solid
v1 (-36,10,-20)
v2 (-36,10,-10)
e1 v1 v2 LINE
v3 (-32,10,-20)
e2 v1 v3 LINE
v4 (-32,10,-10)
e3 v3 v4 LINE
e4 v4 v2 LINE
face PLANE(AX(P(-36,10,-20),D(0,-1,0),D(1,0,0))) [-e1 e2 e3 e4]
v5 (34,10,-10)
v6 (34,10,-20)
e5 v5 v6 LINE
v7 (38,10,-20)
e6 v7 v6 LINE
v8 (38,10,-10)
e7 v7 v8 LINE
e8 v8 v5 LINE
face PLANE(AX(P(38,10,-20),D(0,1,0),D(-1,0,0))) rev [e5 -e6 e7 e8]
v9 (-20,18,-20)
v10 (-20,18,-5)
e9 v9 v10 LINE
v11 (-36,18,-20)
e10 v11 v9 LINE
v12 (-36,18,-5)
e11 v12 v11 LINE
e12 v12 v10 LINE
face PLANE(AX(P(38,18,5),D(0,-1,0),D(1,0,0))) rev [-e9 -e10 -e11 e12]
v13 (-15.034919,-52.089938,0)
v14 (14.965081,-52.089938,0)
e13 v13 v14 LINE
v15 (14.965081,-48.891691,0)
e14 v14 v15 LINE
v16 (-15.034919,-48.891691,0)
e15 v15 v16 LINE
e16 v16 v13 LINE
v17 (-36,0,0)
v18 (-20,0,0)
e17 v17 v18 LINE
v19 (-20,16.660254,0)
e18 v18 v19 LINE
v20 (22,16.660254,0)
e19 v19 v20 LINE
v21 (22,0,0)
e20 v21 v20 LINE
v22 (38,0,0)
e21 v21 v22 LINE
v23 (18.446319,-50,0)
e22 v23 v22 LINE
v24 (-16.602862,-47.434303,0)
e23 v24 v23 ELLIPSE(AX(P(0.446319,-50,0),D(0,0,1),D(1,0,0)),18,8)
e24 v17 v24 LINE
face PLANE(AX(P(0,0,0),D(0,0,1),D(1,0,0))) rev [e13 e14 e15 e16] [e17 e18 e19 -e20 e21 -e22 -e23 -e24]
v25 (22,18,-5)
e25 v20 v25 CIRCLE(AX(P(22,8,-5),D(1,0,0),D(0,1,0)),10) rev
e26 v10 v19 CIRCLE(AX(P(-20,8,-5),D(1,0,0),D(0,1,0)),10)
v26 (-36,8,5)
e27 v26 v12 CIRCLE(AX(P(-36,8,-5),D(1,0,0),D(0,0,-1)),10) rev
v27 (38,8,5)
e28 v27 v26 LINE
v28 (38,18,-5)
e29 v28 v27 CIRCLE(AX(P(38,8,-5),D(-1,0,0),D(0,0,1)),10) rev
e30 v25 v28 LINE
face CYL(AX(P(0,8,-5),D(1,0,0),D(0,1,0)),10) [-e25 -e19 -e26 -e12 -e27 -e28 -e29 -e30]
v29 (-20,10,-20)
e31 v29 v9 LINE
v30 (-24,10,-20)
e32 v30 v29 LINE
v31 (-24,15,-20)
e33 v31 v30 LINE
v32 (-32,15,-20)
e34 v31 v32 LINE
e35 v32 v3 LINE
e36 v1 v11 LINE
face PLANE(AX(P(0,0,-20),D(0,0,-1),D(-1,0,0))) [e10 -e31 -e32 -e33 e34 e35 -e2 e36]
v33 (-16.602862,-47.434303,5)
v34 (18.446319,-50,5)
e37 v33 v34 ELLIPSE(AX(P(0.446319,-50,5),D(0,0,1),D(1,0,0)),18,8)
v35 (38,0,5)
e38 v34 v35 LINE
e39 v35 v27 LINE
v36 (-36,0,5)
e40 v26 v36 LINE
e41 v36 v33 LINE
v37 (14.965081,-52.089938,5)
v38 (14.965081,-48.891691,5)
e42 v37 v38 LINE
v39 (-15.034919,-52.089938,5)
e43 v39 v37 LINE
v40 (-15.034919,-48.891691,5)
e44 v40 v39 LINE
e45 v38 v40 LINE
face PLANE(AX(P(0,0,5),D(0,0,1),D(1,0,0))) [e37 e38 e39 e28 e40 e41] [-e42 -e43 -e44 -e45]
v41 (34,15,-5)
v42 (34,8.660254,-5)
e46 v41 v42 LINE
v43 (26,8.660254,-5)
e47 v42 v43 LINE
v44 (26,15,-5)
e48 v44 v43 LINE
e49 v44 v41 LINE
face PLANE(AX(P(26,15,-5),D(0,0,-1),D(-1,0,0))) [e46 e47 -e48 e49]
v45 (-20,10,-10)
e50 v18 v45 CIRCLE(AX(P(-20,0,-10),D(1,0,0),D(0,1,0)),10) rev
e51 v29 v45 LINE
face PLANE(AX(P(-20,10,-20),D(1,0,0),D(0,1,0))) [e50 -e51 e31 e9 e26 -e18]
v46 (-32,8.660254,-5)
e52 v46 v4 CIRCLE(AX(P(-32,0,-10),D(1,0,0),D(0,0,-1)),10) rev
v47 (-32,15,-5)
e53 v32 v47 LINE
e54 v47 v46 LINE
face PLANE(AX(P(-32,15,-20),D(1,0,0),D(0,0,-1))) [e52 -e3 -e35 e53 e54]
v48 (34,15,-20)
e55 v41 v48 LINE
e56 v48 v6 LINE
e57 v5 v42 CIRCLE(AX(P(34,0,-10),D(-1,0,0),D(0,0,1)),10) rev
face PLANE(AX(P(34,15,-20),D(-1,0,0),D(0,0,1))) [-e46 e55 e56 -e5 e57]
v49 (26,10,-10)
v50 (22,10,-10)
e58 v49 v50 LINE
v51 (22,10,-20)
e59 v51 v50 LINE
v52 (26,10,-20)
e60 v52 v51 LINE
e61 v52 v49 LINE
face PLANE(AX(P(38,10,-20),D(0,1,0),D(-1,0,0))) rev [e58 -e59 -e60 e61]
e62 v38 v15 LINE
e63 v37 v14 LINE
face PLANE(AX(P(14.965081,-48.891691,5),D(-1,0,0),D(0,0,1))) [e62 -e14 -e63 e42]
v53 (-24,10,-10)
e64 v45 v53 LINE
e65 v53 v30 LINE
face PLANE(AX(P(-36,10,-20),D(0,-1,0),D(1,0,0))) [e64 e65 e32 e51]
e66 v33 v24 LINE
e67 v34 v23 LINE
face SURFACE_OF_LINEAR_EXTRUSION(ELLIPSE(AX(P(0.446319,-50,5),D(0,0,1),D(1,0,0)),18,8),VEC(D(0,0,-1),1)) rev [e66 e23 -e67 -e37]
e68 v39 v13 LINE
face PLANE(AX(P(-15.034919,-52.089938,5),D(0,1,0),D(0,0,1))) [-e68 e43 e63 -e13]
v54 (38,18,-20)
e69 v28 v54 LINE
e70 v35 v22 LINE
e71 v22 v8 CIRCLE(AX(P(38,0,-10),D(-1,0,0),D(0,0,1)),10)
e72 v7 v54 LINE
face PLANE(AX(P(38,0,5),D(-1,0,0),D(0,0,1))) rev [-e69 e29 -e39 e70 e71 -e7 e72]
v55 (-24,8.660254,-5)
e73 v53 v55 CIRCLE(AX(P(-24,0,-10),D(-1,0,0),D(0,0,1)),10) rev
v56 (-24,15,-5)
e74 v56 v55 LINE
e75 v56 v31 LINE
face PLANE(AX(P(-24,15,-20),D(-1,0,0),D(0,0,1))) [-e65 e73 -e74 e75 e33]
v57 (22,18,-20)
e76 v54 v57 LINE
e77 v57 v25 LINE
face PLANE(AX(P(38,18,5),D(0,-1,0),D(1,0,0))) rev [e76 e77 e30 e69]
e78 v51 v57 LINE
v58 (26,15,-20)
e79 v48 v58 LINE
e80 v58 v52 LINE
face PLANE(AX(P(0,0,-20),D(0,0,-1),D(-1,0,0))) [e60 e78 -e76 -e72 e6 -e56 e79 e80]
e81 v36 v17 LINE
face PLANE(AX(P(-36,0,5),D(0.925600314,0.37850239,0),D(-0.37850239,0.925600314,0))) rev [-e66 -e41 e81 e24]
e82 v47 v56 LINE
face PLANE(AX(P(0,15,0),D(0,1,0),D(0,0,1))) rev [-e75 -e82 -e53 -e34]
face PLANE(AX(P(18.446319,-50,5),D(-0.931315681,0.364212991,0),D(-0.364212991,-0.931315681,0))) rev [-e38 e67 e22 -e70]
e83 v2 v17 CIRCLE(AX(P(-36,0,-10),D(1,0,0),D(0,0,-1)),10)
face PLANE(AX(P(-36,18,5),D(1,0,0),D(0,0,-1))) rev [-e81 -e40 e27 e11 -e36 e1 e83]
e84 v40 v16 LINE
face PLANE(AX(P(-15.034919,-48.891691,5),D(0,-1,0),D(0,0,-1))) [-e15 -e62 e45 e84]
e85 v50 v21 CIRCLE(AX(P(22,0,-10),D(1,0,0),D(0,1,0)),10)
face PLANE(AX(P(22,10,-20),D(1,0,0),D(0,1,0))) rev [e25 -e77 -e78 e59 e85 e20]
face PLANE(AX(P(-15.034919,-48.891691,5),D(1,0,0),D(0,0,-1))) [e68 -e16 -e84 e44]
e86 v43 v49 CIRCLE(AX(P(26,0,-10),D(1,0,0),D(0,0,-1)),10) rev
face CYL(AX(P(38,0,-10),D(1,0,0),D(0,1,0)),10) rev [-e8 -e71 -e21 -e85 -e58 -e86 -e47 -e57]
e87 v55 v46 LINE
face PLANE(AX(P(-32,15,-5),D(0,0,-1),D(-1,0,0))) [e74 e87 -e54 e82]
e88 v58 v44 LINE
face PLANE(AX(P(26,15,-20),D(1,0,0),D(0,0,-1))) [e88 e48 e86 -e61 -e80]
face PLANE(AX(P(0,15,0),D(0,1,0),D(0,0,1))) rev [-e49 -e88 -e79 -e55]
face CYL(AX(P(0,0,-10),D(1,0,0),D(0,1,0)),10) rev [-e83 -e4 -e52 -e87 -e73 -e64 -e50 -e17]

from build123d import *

# Parameters (mm, degrees)
PLATE_FEATURE_DEPTH        = 5
STRAP_FEATURE_SKETCH_RX    = 18
STRAP_FEATURE_SKETCH_RY    = 8
STRAP_FEATURE_DEPTH        = 5
STRAP_CUT_SKETCH_W         = 30
STRAP_CUT_SKETCH_H         = 3.19824666
STRAP_CUT_DEPTH            = 5
LEFT_LEG_FEATURE_SKETCH_W  = 16
LEFT_LEG_FEATURE_SKETCH_H  = 8
LEFT_LEG_FEATURE_DEPTH     = 20
RIGHT_LEG_FEATURE_SKETCH_W = 16
RIGHT_LEG_FEATURE_SKETCH_H = 8
RIGHT_LEG_FEATURE_DEPTH    = 20
TAB_CUT_SKETCH_W           = 8
TAB_CUT_SKETCH_H           = 15
TAB_CUT_DEPTH              = 5
FILLET1_R                  = 10
FILLET2_R                  = 10
FILLET3_R                  = 10


with BuildPart() as part:
    # Plate Feature Sketch → Plate Feature (new body)
    with BuildSketch(Plane.XY):
        Polygon((-36, 18), (-36, 0), (-15.55368079, -50), (18.44631921, -50), (38, 0), (38, 18), align=None)
    extrude(amount=PLATE_FEATURE_DEPTH)

    # Strap Feature Sketch → Strap Feature (add)
    with BuildSketch(Plane.XY):
        with Locations((0.44631921, -50)):
            Ellipse(STRAP_FEATURE_SKETCH_RX, STRAP_FEATURE_SKETCH_RY)
    extrude(amount=STRAP_FEATURE_DEPTH)

    # Strap Cut Sketch → Strap Cut (cut)
    with BuildSketch(Plane.XY):
        with Locations((-0.034918838, -50.490814337)):
            Rectangle(STRAP_CUT_SKETCH_W, STRAP_CUT_SKETCH_H)
    extrude(amount=STRAP_CUT_DEPTH, mode=Mode.SUBTRACT)

    # Left Leg Feature Sketch → Left Leg Feature (add)
    with BuildSketch(Plane.XY):
        with Locations((30, 14)):
            Rectangle(LEFT_LEG_FEATURE_SKETCH_W, LEFT_LEG_FEATURE_SKETCH_H)
    extrude(amount=-LEFT_LEG_FEATURE_DEPTH)

    # Right Leg Feature Sketch → Right Leg Feature (add)
    with BuildSketch(Plane.XY):
        with Locations((-28, 14)):
            Rectangle(RIGHT_LEG_FEATURE_SKETCH_W, RIGHT_LEG_FEATURE_SKETCH_H)
    extrude(amount=-RIGHT_LEG_FEATURE_DEPTH)

    # Tab Cut Sketch → Tab Cut (cut)
    with BuildSketch(Plane(origin=(0, 10, 0), x_dir=(1, 0, 0), z_dir=(0, 1, 0))):
        with Locations((-28, 12.5)):
            Rectangle(TAB_CUT_SKETCH_W, TAB_CUT_SKETCH_H)
        with Locations((30, 12.5)):
            Rectangle(TAB_CUT_SKETCH_W, TAB_CUT_SKETCH_H)
    extrude(amount=TAB_CUT_DEPTH, mode=Mode.SUBTRACT)

    # Fillet1
    # the kernel refuses this fillet: 10 mm, written as the material it takes off along each edge
    with BuildSketch(Plane(origin=(63, 18, 5), x_dir=(0, 0, -1), z_dir=(-1, 0, 0))) as fillet1_piece_1:
        with BuildLine():
            CenterArc((FILLET1_R, FILLET1_R), FILLET1_R, 180, 90)
            Line((0, FILLET1_R), (0, 0))
            Line((0, 0), (FILLET1_R, 0))
        make_face()
    extrude(amount=124, mode=Mode.SUBTRACT)

    # Fillet2
    # the kernel refuses this fillet: 10 mm, written as the material it adds along each edge
    with BuildSketch(Plane(origin=(-36, 10, 0), x_dir=(0, 0, -1), z_dir=(1, 0, 0))) as fillet2_piece_1_section:
        with BuildLine():
            CenterArc((FILLET2_R, -FILLET2_R), FILLET2_R, 90, 90)
            Line((0, -FILLET2_R), (0, 0))
            Line((0, 0), (FILLET2_R, 0))
        make_face()
    fillet2_piece_1 = extrude(amount=16, mode=Mode.PRIVATE)
    fillet2_piece_1 = split(fillet2_piece_1, bisect_by=Plane(origin=(-34, 9.759916183, -5), z_dir=(0, 0, -1)), keep=Keep.TOP, mode=Mode.PRIVATE)
    fillet2_piece_1 = split(fillet2_piece_1, bisect_by=Plane(origin=(-32, 9.759916183, -6.632507845), z_dir=(-1, 0, 0)), keep=Keep.TOP, mode=Mode.PRIVATE)
    add(fillet2_piece_1)
    with BuildSketch(Plane(origin=(-36, 10, 0), x_dir=(0, 0, -1), z_dir=(1, 0, 0))) as fillet2_piece_2_section:
        with BuildLine():
            CenterArc((FILLET2_R, -FILLET2_R), FILLET2_R, 90, 90)
            Line((0, -FILLET2_R), (0, 0))
            Line((0, 0), (FILLET2_R, 0))
        make_face()
    fillet2_piece_2 = extrude(amount=16, mode=Mode.PRIVATE)
    fillet2_piece_2 = split(fillet2_piece_2, bisect_by=Plane(origin=(-34, 7.4487994, -5), z_dir=(0, 0, 1)), keep=Keep.TOP, mode=Mode.PRIVATE)
    fillet2_piece_2 = split(fillet2_piece_2, bisect_by=Plane(origin=(-32, 7.4487994, -1.643917643), z_dir=(-1, 0, 0)), keep=Keep.TOP, mode=Mode.PRIVATE)
    add(fillet2_piece_2)
    with BuildSketch(Plane(origin=(-36, 10, 0), x_dir=(0, 0, -1), z_dir=(1, 0, 0))) as fillet2_piece_3_section:
        with BuildLine():
            CenterArc((FILLET2_R, -FILLET2_R), FILLET2_R, 90, 90)
            Line((0, -FILLET2_R), (0, 0))
            Line((0, 0), (FILLET2_R, 0))
        make_face()
    fillet2_piece_3 = extrude(amount=16, mode=Mode.PRIVATE)
    fillet2_piece_3 = split(fillet2_piece_3, bisect_by=Plane(origin=(-24, 7.4487994, -1.643917643), z_dir=(-1, 0, 0)), keep=Keep.TOP, mode=Mode.PRIVATE)
    fillet2_piece_3 = split(fillet2_piece_3, bisect_by=Plane(origin=(-28, 7.4487994, -5), z_dir=(0, 0, 1)), keep=Keep.TOP, mode=Mode.PRIVATE)
    fillet2_piece_3 = split(fillet2_piece_3, bisect_by=Plane(origin=(-32, 7.4487994, -1.643917643), z_dir=(1, 0, 0)), keep=Keep.TOP, mode=Mode.PRIVATE)
    add(fillet2_piece_3)
    with BuildSketch(Plane(origin=(-36, 10, 0), x_dir=(0, 0, -1), z_dir=(1, 0, 0))) as fillet2_piece_4_section:
        with BuildLine():
            CenterArc((FILLET2_R, -FILLET2_R), FILLET2_R, 90, 90)
            Line((0, -FILLET2_R), (0, 0))
            Line((0, 0), (FILLET2_R, 0))
        make_face()
    fillet2_piece_4 = extrude(amount=16, mode=Mode.PRIVATE)
    fillet2_piece_4 = split(fillet2_piece_4, bisect_by=Plane(origin=(-24, 9.759916183, -6.632507845), z_dir=(1, 0, 0)), keep=Keep.TOP, mode=Mode.PRIVATE)
    fillet2_piece_4 = split(fillet2_piece_4, bisect_by=Plane(origin=(-22, 9.759916183, -5), z_dir=(0, 0, -1)), keep=Keep.TOP, mode=Mode.PRIVATE)
    add(fillet2_piece_4)
    with BuildSketch(Plane(origin=(-36, 10, 0), x_dir=(0, 0, -1), z_dir=(1, 0, 0))) as fillet2_piece_5_section:
        with BuildLine():
            CenterArc((FILLET2_R, -FILLET2_R), FILLET2_R, 90, 90)
            Line((0, -FILLET2_R), (0, 0))
            Line((0, 0), (FILLET2_R, 0))
        make_face()
    fillet2_piece_5 = extrude(amount=16, mode=Mode.PRIVATE)
    fillet2_piece_5 = split(fillet2_piece_5, bisect_by=Plane(origin=(-24, 7.4487994, -1.643917643), z_dir=(1, 0, 0)), keep=Keep.TOP, mode=Mode.PRIVATE)
    fillet2_piece_5 = split(fillet2_piece_5, bisect_by=Plane(origin=(-22, 7.4487994, -5), z_dir=(0, 0, 1)), keep=Keep.TOP, mode=Mode.PRIVATE)
    add(fillet2_piece_5)

    # Fillet3
    # the kernel refuses this fillet: 10 mm, written as the material it adds along each edge
    with BuildSketch(Plane(origin=(38, 10, 0), x_dir=(0, 0, -1), z_dir=(-1, 0, 0))) as fillet3_piece_1_section:
        with BuildLine():
            CenterArc((FILLET3_R, FILLET3_R), FILLET3_R, 180, 90)
            Line((0, FILLET3_R), (0, 0))
            Line((0, 0), (FILLET3_R, 0))
        make_face()
    fillet3_piece_1 = extrude(amount=16, mode=Mode.PRIVATE)
    fillet3_piece_1 = split(fillet3_piece_1, bisect_by=Plane(origin=(36, 9.759916183, -5), z_dir=(0, 0, -1)), keep=Keep.TOP, mode=Mode.PRIVATE)
    fillet3_piece_1 = split(fillet3_piece_1, bisect_by=Plane(origin=(34, 9.759916183, -6.632507845), z_dir=(1, 0, 0)), keep=Keep.TOP, mode=Mode.PRIVATE)
    add(fillet3_piece_1)
    with BuildSketch(Plane(origin=(38, 10, 0), x_dir=(0, 0, -1), z_dir=(-1, 0, 0))) as fillet3_piece_2_section:
        with BuildLine():
            CenterArc((FILLET3_R, FILLET3_R), FILLET3_R, 180, 90)
            Line((0, FILLET3_R), (0, 0))
            Line((0, 0), (FILLET3_R, 0))
        make_face()
    fillet3_piece_2 = extrude(amount=16, mode=Mode.PRIVATE)
    fillet3_piece_2 = split(fillet3_piece_2, bisect_by=Plane(origin=(36, 7.4487994, -5), z_dir=(0, 0, 1)), keep=Keep.TOP, mode=Mode.PRIVATE)
    fillet3_piece_2 = split(fillet3_piece_2, bisect_by=Plane(origin=(34, 7.4487994, -1.643917643), z_dir=(1, 0, 0)), keep=Keep.TOP, mode=Mode.PRIVATE)
    add(fillet3_piece_2)
    with BuildSketch(Plane(origin=(38, 10, 0), x_dir=(0, 0, -1), z_dir=(-1, 0, 0))) as fillet3_piece_3_section:
        with BuildLine():
            CenterArc((FILLET3_R, FILLET3_R), FILLET3_R, 180, 90)
            Line((0, FILLET3_R), (0, 0))
            Line((0, 0), (FILLET3_R, 0))
        make_face()
    fillet3_piece_3 = extrude(amount=16, mode=Mode.PRIVATE)
    fillet3_piece_3 = split(fillet3_piece_3, bisect_by=Plane(origin=(26, 7.4487994, -1.643917643), z_dir=(1, 0, 0)), keep=Keep.TOP, mode=Mode.PRIVATE)
    fillet3_piece_3 = split(fillet3_piece_3, bisect_by=Plane(origin=(30, 7.4487994, -5), z_dir=(0, 0, 1)), keep=Keep.TOP, mode=Mode.PRIVATE)
    fillet3_piece_3 = split(fillet3_piece_3, bisect_by=Plane(origin=(34, 7.4487994, -1.643917643), z_dir=(-1, 0, 0)), keep=Keep.TOP, mode=Mode.PRIVATE)
    add(fillet3_piece_3)
    with BuildSketch(Plane(origin=(38, 10, 0), x_dir=(0, 0, -1), z_dir=(-1, 0, 0))) as fillet3_piece_4_section:
        with BuildLine():
            CenterArc((FILLET3_R, FILLET3_R), FILLET3_R, 180, 90)
            Line((0, FILLET3_R), (0, 0))
            Line((0, 0), (FILLET3_R, 0))
        make_face()
    fillet3_piece_4 = extrude(amount=16, mode=Mode.PRIVATE)
    fillet3_piece_4 = split(fillet3_piece_4, bisect_by=Plane(origin=(26, 9.759916183, -6.632507845), z_dir=(-1, 0, 0)), keep=Keep.TOP, mode=Mode.PRIVATE)
    fillet3_piece_4 = split(fillet3_piece_4, bisect_by=Plane(origin=(24, 9.759916183, -5), z_dir=(0, 0, -1)), keep=Keep.TOP, mode=Mode.PRIVATE)
    add(fillet3_piece_4)
    with BuildSketch(Plane(origin=(38, 10, 0), x_dir=(0, 0, -1), z_dir=(-1, 0, 0))) as fillet3_piece_5_section:
        with BuildLine():
            CenterArc((FILLET3_R, FILLET3_R), FILLET3_R, 180, 90)
            Line((0, FILLET3_R), (0, 0))
            Line((0, 0), (FILLET3_R, 0))
        make_face()
    fillet3_piece_5 = extrude(amount=16, mode=Mode.PRIVATE)
    fillet3_piece_5 = split(fillet3_piece_5, bisect_by=Plane(origin=(26, 7.4487994, -1.643917643), z_dir=(-1, 0, 0)), keep=Keep.TOP, mode=Mode.PRIVATE)
    fillet3_piece_5 = split(fillet3_piece_5, bisect_by=Plane(origin=(24, 7.4487994, -5), z_dir=(0, 0, 1)), keep=Keep.TOP, mode=Mode.PRIVATE)
    add(fillet3_piece_5)


solid = part.part
